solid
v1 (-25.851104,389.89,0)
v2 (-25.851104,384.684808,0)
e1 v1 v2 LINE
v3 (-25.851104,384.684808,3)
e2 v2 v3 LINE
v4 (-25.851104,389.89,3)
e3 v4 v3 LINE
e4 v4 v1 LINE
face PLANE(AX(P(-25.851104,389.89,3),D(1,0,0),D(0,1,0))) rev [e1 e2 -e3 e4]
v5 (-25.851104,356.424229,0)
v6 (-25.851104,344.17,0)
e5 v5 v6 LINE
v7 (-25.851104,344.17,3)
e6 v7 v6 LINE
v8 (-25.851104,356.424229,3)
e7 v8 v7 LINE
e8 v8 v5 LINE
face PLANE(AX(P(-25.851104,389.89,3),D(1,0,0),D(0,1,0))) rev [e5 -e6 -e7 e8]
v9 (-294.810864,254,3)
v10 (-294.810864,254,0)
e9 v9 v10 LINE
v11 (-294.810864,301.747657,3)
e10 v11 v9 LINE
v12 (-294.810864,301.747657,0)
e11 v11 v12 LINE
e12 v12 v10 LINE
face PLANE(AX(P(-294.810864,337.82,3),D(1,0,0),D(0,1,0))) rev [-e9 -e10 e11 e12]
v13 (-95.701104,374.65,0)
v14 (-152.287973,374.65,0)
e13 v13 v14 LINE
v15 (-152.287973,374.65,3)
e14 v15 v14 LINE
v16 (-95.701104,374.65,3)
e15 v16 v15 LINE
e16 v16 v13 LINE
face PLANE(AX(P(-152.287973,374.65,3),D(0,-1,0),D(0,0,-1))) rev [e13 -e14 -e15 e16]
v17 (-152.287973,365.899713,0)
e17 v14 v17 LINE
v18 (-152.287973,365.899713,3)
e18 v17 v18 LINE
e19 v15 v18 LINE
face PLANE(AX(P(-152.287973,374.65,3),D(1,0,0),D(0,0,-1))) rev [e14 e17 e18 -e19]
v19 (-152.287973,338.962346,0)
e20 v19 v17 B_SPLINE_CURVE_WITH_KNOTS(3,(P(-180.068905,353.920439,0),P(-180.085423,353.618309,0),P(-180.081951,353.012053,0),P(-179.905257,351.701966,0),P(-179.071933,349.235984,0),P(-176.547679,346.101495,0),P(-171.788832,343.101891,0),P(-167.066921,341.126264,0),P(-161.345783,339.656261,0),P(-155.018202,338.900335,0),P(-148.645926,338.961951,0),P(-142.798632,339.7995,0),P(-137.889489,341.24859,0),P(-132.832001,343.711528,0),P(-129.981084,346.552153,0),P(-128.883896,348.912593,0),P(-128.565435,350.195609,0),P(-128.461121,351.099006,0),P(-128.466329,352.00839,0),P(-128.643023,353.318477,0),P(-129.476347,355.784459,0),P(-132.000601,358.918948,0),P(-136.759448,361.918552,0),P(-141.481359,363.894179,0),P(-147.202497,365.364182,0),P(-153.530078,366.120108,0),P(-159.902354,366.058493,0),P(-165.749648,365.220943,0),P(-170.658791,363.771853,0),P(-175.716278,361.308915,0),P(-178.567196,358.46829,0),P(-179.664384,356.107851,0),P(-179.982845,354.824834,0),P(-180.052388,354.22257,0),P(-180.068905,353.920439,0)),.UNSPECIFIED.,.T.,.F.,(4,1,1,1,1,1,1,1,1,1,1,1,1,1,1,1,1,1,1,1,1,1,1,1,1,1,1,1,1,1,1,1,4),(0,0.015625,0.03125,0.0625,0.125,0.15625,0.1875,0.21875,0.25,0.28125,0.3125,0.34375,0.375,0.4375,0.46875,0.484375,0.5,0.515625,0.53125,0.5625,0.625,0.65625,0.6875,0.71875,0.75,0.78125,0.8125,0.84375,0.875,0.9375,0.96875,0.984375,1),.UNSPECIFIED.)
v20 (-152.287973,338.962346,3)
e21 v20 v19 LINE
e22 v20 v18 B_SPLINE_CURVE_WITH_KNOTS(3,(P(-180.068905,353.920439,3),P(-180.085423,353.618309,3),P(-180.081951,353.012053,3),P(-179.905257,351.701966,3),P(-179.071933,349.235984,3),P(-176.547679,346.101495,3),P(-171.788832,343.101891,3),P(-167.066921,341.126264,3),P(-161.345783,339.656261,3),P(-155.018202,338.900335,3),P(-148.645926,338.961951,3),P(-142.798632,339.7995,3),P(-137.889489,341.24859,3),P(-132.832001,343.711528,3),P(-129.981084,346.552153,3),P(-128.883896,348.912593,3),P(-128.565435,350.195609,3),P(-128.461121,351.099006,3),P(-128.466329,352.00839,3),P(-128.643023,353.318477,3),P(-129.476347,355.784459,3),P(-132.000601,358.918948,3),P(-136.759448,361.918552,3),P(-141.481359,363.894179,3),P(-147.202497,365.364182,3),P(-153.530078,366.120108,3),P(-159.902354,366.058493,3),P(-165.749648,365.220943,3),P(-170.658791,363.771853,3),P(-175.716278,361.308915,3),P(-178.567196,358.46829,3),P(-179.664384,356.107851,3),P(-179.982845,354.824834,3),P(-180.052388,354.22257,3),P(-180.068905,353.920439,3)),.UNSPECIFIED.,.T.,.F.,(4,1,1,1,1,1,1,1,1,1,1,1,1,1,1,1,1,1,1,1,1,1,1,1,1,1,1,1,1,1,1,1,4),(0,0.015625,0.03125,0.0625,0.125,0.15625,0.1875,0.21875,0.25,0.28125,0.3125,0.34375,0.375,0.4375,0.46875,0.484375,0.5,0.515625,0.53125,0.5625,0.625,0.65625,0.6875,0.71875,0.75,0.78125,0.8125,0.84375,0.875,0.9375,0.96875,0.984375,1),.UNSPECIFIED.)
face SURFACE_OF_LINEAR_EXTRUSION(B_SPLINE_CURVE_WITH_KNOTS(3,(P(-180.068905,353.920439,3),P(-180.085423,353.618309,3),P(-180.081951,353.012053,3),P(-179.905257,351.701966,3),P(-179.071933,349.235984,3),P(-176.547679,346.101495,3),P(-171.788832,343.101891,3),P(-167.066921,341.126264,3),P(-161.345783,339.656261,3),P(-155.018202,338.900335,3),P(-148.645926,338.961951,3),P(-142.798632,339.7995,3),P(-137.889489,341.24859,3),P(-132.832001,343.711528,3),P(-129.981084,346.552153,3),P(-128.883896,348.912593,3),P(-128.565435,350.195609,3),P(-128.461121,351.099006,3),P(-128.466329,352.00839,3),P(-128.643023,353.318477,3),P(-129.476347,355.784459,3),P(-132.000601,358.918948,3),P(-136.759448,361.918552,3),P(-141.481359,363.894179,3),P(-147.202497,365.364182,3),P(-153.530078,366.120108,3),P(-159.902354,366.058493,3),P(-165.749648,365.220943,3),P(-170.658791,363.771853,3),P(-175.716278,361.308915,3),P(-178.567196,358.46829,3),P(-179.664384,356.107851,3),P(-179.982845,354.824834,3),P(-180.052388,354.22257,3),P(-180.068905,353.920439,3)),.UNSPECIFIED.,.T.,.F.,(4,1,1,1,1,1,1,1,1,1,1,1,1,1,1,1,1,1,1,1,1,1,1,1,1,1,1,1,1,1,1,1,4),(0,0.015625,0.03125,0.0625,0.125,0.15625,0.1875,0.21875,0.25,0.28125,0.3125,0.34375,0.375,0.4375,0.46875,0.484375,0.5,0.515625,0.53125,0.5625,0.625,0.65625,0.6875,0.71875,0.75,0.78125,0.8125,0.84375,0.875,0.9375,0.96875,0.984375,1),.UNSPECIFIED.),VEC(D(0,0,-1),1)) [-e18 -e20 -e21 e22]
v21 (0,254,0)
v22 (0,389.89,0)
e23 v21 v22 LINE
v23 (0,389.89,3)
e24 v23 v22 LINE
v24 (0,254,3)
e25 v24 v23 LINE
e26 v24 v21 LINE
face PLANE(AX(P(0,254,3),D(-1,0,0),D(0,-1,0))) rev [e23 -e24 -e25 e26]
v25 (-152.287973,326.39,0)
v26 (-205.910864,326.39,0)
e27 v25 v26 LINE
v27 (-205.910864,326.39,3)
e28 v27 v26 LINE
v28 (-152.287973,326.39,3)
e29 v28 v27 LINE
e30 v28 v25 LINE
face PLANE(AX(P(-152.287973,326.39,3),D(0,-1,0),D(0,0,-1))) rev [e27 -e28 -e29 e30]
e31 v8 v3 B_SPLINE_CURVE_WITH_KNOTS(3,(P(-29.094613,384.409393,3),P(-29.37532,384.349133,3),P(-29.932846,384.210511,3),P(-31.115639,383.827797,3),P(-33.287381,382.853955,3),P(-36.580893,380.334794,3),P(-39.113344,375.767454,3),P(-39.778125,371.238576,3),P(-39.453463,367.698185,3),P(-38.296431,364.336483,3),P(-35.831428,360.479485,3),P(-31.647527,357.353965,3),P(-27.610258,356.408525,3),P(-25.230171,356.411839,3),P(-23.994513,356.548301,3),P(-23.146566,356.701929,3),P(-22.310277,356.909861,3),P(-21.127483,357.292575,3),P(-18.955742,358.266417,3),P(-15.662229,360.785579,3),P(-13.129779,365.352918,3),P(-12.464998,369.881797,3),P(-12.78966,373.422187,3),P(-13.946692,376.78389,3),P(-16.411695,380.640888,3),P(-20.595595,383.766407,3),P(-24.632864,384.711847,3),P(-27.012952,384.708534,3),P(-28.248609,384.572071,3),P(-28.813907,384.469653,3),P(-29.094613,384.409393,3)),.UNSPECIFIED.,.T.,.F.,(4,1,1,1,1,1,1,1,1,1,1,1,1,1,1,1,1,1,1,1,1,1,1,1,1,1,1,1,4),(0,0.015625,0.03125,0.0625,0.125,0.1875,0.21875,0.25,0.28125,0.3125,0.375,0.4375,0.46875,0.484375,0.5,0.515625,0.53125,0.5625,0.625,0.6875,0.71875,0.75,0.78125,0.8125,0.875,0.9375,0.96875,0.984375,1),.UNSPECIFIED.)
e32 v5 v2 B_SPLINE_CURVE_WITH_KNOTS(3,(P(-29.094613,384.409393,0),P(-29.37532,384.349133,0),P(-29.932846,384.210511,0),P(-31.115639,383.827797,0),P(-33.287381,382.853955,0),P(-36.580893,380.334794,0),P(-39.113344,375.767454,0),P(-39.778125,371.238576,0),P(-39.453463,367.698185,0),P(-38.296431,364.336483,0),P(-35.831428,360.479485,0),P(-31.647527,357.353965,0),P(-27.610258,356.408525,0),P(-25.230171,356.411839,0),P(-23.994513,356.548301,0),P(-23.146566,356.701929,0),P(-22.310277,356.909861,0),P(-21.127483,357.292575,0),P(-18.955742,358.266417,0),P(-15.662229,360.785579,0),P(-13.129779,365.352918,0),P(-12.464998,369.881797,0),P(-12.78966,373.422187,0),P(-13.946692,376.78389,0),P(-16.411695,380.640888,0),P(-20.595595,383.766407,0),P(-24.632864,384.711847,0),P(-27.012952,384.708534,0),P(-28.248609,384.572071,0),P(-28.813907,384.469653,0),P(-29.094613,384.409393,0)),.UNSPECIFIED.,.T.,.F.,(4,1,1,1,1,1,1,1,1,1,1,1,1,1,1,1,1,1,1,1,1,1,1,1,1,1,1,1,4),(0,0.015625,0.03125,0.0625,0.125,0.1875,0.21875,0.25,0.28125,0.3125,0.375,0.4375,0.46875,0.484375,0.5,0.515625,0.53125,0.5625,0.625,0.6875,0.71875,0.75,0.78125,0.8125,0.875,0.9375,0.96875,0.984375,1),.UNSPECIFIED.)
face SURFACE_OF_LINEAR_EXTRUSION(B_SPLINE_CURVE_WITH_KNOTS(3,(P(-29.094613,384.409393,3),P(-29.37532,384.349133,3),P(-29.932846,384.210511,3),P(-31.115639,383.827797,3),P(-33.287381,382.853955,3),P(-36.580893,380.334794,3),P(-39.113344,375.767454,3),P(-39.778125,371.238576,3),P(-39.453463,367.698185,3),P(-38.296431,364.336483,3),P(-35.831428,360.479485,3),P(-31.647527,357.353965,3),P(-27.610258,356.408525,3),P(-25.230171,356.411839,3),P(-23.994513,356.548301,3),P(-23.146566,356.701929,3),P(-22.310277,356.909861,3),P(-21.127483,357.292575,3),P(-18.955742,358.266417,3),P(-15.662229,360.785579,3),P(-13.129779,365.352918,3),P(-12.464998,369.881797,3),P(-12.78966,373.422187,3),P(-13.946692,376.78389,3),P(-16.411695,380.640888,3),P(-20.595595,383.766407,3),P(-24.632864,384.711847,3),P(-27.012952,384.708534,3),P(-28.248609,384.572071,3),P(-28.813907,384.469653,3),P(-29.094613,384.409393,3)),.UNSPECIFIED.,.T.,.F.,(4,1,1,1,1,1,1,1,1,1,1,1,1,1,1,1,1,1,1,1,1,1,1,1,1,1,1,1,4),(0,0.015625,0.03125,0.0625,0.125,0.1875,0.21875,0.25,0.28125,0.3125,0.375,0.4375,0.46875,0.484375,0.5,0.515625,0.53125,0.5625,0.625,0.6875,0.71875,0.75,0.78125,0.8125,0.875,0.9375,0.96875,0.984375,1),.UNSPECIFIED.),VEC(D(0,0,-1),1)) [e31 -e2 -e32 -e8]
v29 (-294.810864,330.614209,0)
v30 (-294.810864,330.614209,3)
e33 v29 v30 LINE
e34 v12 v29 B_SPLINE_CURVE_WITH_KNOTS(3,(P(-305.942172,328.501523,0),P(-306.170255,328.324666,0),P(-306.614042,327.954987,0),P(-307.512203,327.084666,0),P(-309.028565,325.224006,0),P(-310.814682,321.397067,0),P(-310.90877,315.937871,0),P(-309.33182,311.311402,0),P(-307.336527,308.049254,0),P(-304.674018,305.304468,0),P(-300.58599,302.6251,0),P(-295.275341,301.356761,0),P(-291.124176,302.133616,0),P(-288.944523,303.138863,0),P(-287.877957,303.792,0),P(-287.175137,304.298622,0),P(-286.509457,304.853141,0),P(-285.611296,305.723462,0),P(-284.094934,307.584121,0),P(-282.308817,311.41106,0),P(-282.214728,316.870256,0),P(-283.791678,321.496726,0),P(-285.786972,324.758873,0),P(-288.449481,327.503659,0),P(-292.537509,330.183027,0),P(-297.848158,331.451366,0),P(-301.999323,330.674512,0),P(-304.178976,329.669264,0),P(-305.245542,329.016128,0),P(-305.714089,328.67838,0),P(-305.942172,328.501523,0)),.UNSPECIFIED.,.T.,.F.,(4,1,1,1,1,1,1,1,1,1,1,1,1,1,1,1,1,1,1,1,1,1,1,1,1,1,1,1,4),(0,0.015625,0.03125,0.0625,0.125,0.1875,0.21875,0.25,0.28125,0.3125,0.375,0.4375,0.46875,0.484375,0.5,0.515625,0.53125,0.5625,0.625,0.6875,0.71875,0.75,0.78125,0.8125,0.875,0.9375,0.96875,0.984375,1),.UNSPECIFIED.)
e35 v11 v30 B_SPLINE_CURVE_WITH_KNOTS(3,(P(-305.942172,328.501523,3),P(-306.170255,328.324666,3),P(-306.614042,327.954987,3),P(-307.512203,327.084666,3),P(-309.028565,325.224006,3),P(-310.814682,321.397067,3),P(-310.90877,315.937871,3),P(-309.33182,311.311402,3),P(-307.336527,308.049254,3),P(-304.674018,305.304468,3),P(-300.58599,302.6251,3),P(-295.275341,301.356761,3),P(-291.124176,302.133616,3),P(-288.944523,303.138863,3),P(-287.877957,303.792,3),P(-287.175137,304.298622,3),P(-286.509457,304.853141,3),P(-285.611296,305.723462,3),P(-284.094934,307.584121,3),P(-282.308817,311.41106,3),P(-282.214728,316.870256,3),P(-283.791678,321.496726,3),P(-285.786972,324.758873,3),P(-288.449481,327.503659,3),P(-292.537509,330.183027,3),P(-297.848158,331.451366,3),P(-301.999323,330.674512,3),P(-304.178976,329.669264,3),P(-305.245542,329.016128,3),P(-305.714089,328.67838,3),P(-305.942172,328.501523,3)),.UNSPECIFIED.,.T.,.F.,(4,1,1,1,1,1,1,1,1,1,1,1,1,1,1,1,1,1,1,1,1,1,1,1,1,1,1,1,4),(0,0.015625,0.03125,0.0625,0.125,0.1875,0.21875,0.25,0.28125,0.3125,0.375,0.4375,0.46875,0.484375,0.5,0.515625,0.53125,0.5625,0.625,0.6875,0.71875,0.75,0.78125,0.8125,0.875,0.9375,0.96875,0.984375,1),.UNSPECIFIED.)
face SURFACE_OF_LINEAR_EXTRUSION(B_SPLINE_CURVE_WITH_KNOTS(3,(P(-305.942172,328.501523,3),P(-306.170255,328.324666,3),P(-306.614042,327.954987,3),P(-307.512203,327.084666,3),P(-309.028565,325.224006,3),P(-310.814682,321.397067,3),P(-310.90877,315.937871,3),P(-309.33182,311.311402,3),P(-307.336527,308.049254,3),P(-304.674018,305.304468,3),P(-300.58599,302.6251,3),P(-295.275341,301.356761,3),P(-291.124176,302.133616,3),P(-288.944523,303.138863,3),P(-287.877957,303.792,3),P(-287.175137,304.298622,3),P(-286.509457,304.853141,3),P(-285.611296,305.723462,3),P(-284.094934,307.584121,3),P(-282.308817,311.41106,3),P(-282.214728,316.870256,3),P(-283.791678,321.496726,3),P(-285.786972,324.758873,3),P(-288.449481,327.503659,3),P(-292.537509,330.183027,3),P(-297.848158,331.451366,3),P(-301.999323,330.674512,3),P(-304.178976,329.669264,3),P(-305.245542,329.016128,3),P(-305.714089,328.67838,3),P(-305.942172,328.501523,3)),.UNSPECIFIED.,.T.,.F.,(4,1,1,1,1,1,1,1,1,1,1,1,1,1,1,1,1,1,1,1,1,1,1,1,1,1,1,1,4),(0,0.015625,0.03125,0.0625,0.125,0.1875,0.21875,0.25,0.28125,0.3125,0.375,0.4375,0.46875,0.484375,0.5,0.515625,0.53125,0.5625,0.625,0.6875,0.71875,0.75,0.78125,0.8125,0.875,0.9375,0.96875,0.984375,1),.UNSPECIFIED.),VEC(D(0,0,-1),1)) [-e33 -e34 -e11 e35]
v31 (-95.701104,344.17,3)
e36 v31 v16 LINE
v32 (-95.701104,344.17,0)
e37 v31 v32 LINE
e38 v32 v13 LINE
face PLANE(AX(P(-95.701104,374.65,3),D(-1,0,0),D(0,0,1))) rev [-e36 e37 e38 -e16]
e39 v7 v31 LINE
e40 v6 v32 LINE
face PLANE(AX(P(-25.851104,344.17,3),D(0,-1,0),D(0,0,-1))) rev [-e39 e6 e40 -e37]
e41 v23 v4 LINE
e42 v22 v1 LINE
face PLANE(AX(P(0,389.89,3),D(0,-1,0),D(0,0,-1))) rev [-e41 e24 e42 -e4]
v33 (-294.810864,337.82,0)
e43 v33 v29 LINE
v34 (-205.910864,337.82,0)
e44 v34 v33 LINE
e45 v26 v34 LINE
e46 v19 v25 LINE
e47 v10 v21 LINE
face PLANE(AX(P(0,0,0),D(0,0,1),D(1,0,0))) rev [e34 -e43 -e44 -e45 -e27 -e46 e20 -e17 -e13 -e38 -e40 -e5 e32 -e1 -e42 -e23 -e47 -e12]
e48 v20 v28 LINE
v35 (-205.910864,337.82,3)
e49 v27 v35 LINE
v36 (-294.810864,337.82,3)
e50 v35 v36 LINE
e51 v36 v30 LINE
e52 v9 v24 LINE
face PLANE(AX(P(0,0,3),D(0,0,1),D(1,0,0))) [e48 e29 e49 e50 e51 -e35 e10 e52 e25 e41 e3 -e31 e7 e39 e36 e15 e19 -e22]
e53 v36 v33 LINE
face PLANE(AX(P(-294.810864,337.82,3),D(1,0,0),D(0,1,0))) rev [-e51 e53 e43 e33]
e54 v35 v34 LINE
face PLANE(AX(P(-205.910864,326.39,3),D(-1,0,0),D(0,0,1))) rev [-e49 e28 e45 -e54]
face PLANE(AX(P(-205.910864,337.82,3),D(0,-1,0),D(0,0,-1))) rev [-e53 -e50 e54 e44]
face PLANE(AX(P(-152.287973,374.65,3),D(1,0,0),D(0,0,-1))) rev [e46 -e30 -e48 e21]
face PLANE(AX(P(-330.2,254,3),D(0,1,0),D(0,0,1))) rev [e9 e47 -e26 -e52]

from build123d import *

# Parameters (mm, degrees)
BOSS_EXTRUDE2_OUTLINE_W = 330.2
BOSS_EXTRUDE2_OUTLINE_H = 190.5
BOSS_EXTRUDE2_DEPTH     = 3
CUT_EXTRUDE1_DEPTH      = 554.733952504


# Read off the part's stored shape, not the designer's step: Boss-Extrude2
with BuildPart() as part:
    # Boss-Extrude2 outline → Boss-Extrude2 (new body)
    with BuildSketch(Plane.XY):
        with Locations((-165.1, 349.25)):
            Rectangle(BOSS_EXTRUDE2_OUTLINE_W, BOSS_EXTRUDE2_OUTLINE_H)
        with BuildLine():
            add(Edge.make_bspline(
                [(-305.942171993, 328.501522762), (-306.170255378, 328.324665909), (-306.614042299, 327.954986533), (-307.512202671, 327.084665698), (-309.028565354, 325.224006494), (-310.814681605, 321.397067185), (-310.908770444, 315.937871104), (-309.331820466, 311.311401642), (-307.336526947, 308.049254205), (-304.674018188, 305.304468379), (-300.585989718, 302.625100143), (-295.275340887, 301.356761249), (-291.124175679, 302.133615904), (-288.944522893, 303.138863231), (-287.877956893, 303.791999802), (-287.175136962, 304.298621856), (-286.509456581, 304.853140919), (-285.611296208, 305.723461755), (-284.094933526, 307.584120959), (-282.308817275, 311.411060268), (-282.214728435, 316.870256349), (-283.791678414, 321.496725811), (-285.786971933, 324.758873247), (-288.449480692, 327.503659074), (-292.537509162, 330.18302731), (-297.848157993, 331.451366204), (-301.999323201, 330.674511549), (-304.178975987, 329.669264222), (-305.245541986, 329.01612765), (-305.714088607, 328.678379615), (-305.942171993, 328.501522762)],
                knots=[0, 0, 0, 0, 0.015625, 0.03125, 0.0625, 0.125, 0.1875, 0.21875, 0.25, 0.28125, 0.3125, 0.375, 0.4375, 0.46875, 0.484375, 0.5, 0.515625, 0.53125, 0.5625, 0.625, 0.6875, 0.71875, 0.75, 0.78125, 0.8125, 0.875, 0.9375, 0.96875, 0.984375, 1, 1, 1, 1], degree=3))
        make_face(mode=Mode.SUBTRACT)
        with BuildLine():
            add(Edge.make_bspline(
                [(-180.068905291, 353.920439433), (-180.085422965, 353.618309147), (-180.081950788, 353.012052683), (-179.905256871, 351.701966023), (-179.071932531, 349.235984489), (-176.547678646, 346.101494923), (-171.788832257, 343.101891305), (-167.066920591, 341.126264084), (-161.345782684, 339.656260684), (-155.018201929, 338.900335341), (-148.645925657, 338.961950616), (-142.798632236, 339.799499783), (-137.889488846, 341.248590487), (-132.832001497, 343.711528272), (-129.981083909, 346.552153454), (-128.883895778, 348.912592521), (-128.565435113, 350.195608733), (-128.461120803, 351.099005754), (-128.466329068, 352.008390451), (-128.643022986, 353.31847711), (-129.476347326, 355.784458645), (-132.000601211, 358.918948211), (-136.7594476, 361.918551828), (-141.481359266, 363.89417905), (-147.202497173, 365.36418245), (-153.530077928, 366.120107793), (-159.9023542, 366.058492517), (-165.74964762, 365.220943351), (-170.658791011, 363.771852646), (-175.71627836, 361.308914861), (-178.567195948, 358.468289679), (-179.664384078, 356.107850612), (-179.982844744, 354.8248344), (-180.052387617, 354.22256972), (-180.068905291, 353.920439433)],
                knots=[0, 0, 0, 0, 0.015625, 0.03125, 0.0625, 0.125, 0.15625, 0.1875, 0.21875, 0.25, 0.28125, 0.3125, 0.34375, 0.375, 0.4375, 0.46875, 0.484375, 0.5, 0.515625, 0.53125, 0.5625, 0.625, 0.65625, 0.6875, 0.71875, 0.75, 0.78125, 0.8125, 0.84375, 0.875, 0.9375, 0.96875, 0.984375, 1, 1, 1, 1], degree=3))
        make_face(mode=Mode.SUBTRACT)
        with BuildLine():
            add(Edge.make_bspline(
                [(-29.09461346, 384.409392838), (-29.375319528, 384.349132794), (-29.932845744, 384.210511135), (-31.115639474, 383.827797032), (-33.287380866, 382.853955405), (-36.5808932, 380.334793707), (-39.113343797, 375.767453995), (-39.778124595, 371.238575823), (-39.453462961, 367.698185468), (-38.296430811, 364.336482677), (-35.831427961, 360.479484886), (-31.647527324, 357.353965166), (-27.610258166, 356.408525111), (-25.230170518, 356.411838769), (-23.994513151, 356.548301078), (-23.146566065, 356.701928853), (-22.310276741, 356.909861342), (-21.127483011, 357.292575445), (-18.955741619, 358.266417073), (-15.662229285, 360.78557877), (-13.129778688, 365.352918482), (-12.46499789, 369.881796654), (-12.789659524, 373.42218701), (-13.946691674, 376.7838898), (-16.411694524, 380.640887591), (-20.595595161, 383.766407311), (-24.632864319, 384.711847366), (-27.012951967, 384.708533708), (-28.248609334, 384.572071399), (-28.813907391, 384.469652882), (-29.09461346, 384.409392838)],
                knots=[0, 0, 0, 0, 0.015625, 0.03125, 0.0625, 0.125, 0.1875, 0.21875, 0.25, 0.28125, 0.3125, 0.375, 0.4375, 0.46875, 0.484375, 0.5, 0.515625, 0.53125, 0.5625, 0.625, 0.6875, 0.71875, 0.75, 0.78125, 0.8125, 0.875, 0.9375, 0.96875, 0.984375, 1, 1, 1, 1], degree=3))
        make_face(mode=Mode.SUBTRACT)
    extrude(amount=BOSS_EXTRUDE2_DEPTH)

    # Sketch9 → Cut-Extrude1 (cut, through all)
    with BuildSketch(Plane(origin=(0, 0, 0), x_dir=(-1, 0, 0), z_dir=(0, 0, -1))):
        Polygon((330.2, 444.5), (0, 444.5), (0, 389.89), (25.851104386, 389.89), (25.851104386, 344.17), (95.701104386, 344.17), (95.701104386, 374.65), (152.287972712, 374.65), (152.287972712, 326.39), (205.910863718, 326.39), (205.910863718, 337.82), (294.810863718, 337.82), (294.810863718, 254), (330.2, 254), align=None)
    extrude(amount=-CUT_EXTRUDE1_DEPTH, mode=Mode.SUBTRACT)


solid = part.part
